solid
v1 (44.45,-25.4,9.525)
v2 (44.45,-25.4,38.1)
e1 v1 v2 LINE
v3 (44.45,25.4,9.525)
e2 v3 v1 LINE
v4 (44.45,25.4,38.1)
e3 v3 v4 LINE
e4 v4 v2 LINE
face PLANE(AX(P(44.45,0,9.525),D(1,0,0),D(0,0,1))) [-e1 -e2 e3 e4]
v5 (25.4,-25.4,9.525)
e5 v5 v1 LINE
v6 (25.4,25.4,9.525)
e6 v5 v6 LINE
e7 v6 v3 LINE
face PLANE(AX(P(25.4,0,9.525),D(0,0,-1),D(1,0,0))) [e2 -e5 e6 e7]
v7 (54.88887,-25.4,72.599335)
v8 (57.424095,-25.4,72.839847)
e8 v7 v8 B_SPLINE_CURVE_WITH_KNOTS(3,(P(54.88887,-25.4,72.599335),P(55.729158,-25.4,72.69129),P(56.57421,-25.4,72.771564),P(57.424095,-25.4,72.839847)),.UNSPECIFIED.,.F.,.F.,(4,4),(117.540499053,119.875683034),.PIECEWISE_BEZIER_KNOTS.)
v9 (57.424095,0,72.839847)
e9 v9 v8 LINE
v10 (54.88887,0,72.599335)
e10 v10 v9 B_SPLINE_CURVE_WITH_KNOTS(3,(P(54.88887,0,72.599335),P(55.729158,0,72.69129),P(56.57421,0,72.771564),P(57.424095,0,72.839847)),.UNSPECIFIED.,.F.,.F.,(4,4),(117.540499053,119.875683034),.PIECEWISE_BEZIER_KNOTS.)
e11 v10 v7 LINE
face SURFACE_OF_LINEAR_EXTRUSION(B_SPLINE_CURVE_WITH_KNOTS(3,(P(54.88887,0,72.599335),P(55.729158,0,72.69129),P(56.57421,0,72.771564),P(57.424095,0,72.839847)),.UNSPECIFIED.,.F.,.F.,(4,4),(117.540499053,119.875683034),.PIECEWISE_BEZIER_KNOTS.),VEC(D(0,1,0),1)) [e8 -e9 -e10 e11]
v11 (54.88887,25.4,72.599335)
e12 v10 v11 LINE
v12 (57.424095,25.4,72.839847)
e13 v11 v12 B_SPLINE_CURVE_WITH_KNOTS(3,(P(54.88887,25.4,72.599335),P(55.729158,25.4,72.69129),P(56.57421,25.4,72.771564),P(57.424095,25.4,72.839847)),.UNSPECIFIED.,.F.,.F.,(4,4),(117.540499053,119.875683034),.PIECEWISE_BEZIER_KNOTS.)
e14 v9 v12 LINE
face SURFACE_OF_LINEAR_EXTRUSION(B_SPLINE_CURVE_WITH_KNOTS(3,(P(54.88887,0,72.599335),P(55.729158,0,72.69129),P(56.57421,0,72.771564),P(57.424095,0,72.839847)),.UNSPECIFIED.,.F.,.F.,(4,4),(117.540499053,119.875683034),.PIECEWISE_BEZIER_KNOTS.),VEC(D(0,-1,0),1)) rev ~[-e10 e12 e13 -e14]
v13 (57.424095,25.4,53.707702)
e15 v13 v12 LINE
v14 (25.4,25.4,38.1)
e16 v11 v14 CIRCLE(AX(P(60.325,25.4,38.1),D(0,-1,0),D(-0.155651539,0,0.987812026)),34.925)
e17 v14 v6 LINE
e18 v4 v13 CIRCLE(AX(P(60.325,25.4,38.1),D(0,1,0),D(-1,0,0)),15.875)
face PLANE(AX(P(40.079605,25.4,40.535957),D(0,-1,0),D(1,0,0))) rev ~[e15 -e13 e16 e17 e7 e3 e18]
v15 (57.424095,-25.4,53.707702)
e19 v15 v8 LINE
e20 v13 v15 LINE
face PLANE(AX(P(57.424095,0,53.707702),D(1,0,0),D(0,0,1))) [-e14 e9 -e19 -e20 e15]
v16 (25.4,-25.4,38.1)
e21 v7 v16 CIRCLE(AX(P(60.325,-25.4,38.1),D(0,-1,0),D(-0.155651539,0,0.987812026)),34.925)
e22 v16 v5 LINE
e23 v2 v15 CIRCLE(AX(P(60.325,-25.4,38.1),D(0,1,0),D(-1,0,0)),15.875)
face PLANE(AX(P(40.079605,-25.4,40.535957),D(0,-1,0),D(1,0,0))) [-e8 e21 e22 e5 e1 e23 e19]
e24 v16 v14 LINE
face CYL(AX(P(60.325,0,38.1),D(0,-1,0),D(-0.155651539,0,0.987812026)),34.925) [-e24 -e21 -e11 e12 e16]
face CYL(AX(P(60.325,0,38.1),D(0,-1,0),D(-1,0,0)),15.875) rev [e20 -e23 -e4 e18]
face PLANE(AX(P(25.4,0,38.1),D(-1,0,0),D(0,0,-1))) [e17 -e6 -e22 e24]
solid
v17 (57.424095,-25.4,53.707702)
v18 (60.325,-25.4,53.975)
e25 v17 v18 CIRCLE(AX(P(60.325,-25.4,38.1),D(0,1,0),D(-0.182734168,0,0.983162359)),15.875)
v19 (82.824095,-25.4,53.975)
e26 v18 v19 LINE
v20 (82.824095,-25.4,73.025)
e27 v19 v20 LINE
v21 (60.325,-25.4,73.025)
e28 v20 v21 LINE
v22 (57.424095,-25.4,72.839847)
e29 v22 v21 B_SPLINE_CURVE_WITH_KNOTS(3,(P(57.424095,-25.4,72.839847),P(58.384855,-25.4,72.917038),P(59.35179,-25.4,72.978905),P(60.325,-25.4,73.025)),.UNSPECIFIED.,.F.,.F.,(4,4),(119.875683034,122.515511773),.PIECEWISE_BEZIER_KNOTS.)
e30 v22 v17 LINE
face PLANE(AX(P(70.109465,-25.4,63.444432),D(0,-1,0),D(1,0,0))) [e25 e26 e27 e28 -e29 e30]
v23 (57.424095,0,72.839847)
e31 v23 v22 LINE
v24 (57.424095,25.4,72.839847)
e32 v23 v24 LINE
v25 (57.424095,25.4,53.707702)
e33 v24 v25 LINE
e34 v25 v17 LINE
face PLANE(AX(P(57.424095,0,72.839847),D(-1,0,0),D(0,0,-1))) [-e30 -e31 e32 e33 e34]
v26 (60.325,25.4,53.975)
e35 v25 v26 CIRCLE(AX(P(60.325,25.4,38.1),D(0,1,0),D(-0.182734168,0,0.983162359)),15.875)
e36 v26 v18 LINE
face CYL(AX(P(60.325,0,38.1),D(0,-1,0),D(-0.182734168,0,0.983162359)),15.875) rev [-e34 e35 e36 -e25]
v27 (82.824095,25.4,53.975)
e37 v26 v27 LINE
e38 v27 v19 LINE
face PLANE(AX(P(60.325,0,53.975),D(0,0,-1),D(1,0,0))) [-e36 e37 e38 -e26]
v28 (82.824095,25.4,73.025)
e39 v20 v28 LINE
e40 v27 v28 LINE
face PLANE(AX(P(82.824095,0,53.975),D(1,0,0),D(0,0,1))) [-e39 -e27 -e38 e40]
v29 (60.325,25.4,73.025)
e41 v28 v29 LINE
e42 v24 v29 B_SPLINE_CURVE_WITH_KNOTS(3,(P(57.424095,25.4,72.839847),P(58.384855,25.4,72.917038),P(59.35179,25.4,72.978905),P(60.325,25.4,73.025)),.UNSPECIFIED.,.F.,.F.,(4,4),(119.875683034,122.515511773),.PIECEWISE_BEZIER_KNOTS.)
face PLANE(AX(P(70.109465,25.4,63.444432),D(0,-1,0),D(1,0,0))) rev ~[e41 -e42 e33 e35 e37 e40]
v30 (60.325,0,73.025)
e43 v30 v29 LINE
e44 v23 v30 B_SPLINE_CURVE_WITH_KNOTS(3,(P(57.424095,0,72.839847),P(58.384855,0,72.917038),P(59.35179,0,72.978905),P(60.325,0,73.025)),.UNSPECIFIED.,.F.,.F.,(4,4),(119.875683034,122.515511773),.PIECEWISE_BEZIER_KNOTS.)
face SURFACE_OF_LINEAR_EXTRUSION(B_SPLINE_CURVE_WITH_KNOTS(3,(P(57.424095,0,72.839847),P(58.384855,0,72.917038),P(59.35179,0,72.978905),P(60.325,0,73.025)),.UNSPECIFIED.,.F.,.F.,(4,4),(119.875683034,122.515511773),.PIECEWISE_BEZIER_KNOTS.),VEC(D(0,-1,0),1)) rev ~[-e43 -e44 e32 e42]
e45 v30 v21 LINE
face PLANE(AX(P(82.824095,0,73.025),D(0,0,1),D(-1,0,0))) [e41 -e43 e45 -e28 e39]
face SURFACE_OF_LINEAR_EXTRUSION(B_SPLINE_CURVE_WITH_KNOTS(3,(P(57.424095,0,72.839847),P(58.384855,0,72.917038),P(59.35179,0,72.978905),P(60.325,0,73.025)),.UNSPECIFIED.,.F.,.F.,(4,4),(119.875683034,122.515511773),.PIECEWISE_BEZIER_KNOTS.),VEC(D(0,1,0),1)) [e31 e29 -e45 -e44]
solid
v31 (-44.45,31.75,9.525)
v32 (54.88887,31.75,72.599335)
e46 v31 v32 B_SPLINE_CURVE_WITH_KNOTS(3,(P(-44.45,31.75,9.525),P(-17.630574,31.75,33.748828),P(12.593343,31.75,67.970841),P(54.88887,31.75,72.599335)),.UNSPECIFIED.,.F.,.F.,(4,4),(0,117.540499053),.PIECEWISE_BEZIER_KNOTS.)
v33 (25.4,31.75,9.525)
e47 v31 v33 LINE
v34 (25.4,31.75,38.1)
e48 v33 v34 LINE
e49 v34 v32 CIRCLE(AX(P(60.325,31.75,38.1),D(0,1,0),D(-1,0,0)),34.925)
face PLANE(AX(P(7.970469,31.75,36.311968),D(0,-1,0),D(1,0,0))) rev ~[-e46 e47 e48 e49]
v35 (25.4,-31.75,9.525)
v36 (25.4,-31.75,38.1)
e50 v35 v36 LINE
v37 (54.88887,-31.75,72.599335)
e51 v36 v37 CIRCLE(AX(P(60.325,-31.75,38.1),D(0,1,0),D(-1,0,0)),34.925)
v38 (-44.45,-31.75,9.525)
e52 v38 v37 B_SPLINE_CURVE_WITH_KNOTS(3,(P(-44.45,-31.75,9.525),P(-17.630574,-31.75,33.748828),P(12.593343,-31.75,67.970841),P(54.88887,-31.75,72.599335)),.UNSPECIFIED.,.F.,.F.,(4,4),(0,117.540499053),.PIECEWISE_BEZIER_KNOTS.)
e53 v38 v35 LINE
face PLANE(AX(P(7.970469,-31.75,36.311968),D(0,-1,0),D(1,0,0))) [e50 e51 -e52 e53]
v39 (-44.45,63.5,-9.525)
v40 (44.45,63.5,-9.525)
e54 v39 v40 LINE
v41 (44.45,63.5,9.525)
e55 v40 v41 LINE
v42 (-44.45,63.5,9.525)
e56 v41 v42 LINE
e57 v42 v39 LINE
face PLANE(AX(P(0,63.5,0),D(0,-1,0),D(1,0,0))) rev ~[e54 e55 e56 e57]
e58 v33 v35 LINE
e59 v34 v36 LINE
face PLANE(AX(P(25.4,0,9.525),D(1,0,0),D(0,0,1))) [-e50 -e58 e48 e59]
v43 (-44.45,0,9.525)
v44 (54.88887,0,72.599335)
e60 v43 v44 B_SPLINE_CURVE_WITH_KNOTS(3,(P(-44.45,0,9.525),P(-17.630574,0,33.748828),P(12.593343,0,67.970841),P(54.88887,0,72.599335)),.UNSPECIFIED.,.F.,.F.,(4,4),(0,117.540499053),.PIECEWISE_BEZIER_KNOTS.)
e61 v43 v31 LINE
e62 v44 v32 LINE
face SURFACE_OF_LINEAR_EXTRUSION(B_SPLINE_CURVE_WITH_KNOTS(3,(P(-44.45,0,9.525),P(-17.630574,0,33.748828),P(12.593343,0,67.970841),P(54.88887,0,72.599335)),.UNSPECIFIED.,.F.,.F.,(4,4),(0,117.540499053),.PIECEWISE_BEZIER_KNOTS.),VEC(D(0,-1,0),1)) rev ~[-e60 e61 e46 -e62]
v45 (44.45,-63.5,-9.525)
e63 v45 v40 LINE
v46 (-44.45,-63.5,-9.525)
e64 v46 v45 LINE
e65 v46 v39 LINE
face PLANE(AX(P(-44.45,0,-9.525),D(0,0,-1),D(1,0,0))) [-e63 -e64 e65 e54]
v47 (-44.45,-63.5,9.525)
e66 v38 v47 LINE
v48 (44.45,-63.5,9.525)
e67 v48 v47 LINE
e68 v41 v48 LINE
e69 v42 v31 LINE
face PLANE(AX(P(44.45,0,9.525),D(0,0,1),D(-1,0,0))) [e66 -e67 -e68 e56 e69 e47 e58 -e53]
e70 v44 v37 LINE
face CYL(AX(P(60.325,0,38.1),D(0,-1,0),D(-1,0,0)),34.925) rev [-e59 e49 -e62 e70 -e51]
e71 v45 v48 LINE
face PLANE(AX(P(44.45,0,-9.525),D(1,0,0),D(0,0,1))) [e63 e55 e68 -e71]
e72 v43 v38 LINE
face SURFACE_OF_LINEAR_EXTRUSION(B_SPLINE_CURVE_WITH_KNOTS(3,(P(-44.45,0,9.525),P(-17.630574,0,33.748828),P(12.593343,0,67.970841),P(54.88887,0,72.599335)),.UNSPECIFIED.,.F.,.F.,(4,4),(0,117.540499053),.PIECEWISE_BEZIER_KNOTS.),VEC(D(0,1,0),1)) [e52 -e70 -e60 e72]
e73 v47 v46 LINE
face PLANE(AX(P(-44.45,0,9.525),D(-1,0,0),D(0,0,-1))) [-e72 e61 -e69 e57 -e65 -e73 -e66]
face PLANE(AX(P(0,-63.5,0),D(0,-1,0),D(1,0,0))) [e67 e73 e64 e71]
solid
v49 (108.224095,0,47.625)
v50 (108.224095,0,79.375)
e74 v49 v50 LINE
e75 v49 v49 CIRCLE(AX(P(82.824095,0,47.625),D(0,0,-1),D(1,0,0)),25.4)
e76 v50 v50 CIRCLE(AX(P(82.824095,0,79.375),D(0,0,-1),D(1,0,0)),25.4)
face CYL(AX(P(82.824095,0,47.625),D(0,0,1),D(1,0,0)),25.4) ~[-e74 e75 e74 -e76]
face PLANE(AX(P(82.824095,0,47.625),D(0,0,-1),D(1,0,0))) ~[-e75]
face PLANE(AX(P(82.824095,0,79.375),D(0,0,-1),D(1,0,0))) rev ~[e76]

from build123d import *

# Parameters (mm, degrees)
F1_DEPTH = 63.5
F2_DEPTH = 31.75
F3_DEPTH = 25.4
F5_DEPTH = 25.4


with BuildPart() as f1:
    # F0 (on Front) → F1 (new body, symmetric)
    with BuildSketch(Plane.XZ):
        Polygon((44.45, -9.525), (44.45, 9.525), (25.4, 9.525), (-44.45, 9.525), (-44.45, -9.525), align=None)
    extrude(amount=F1_DEPTH, both=True)

    # F0 (on Front) → F2 (join, symmetric)
    with BuildSketch(Plane.XZ):
        with BuildLine():
            Line((-44.45, 9.525), (25.4, 9.525))
            Line((25.4, 9.525), (25.4, 38.1))
            ThreePointArc((25.4, 38.1), (33.7768130044, 60.7924963864), (54.8888699925, 72.5993350014))
            add(Edge.make_bspline(
                [(-44.45, 9.525), (-17.630573516, 33.748828198), (12.5933430679, 67.9708407592), (54.8888699925, 72.5993350014)],
                knots=[0, 0, 0, 0, 117.5404990535, 117.5404990535, 117.5404990535, 117.5404990535], degree=3))
        make_face()
    extrude(amount=F2_DEPTH, both=True)


with BuildPart() as f3:
    # F0 (on Front) → F3 (new body, symmetric)
    with BuildSketch(Plane.XZ):
        with BuildLine():
            Line((57.4240950841, 72.8398465542), (57.4240950841, 53.7077024468))
            ThreePointArc((57.4240950841, 53.7077024468), (58.8684031689, 53.9080343709), (60.325, 53.975))
            Line((60.325, 53.975), (82.8240950841, 53.975))
            Line((82.8240950841, 53.975), (82.8240950841, 73.025))
            Line((82.8240950841, 73.025), (60.325, 73.025))
            add(Edge.make_bspline(
                [(57.4240950841, 72.8398465542), (58.3848548691, 72.9170376368), (59.3517904465, 72.9789049543), (60.325, 73.025)],
                knots=[119.8756830341, 119.8756830341, 119.8756830341, 119.8756830341, 122.515511773, 122.515511773, 122.515511773, 122.515511773], degree=3))
        make_face()
    extrude(amount=F3_DEPTH, both=True)


with BuildPart() as f4:
    # F0 (on Front) → F4 (revolve)
    with BuildSketch(Plane.XZ):
        Polygon((82.8240950841, 53.975), (82.8240950841, 47.625), (108.2240950841, 47.625), (108.2240950841, 79.375), (82.8240950841, 79.375), (82.8240950841, 73.025), align=None)
    revolve(axis=Axis((82.8240950841, 0, 63.5), (0, 0, -1)))


with BuildPart() as f5:
    # F0 (on Front) → F5 (new body, symmetric)
    with BuildSketch(Plane.XZ):
        with BuildLine():
            Line((25.4, 9.525), (44.45, 9.525))
            Line((44.45, 9.525), (44.45, 38.1))
            ThreePointArc((44.45, 38.1), (48.1170622024, 48.2479988042), (57.4240950841, 53.7077024468))
            Line((57.4240950841, 53.7077024468), (57.4240950841, 72.8398465542))
            add(Edge.make_bspline(
                [(54.8888699925, 72.5993350014), (55.7291577038, 72.6912895677), (56.5742100798, 72.7715635718), (57.4240950841, 72.8398465542)],
                knots=[117.5404990535, 117.5404990535, 117.5404990535, 117.5404990535, 119.8756830341, 119.8756830341, 119.8756830341, 119.8756830341], degree=3))
            ThreePointArc((54.8888699925, 72.5993350014), (33.7768130044, 60.7924963864), (25.4, 38.1))
            Line((25.4, 38.1), (25.4, 9.525))
        make_face()
    extrude(amount=F5_DEPTH, both=True)


solid = Compound([f1.part, f3.part, f4.part, f5.part])
